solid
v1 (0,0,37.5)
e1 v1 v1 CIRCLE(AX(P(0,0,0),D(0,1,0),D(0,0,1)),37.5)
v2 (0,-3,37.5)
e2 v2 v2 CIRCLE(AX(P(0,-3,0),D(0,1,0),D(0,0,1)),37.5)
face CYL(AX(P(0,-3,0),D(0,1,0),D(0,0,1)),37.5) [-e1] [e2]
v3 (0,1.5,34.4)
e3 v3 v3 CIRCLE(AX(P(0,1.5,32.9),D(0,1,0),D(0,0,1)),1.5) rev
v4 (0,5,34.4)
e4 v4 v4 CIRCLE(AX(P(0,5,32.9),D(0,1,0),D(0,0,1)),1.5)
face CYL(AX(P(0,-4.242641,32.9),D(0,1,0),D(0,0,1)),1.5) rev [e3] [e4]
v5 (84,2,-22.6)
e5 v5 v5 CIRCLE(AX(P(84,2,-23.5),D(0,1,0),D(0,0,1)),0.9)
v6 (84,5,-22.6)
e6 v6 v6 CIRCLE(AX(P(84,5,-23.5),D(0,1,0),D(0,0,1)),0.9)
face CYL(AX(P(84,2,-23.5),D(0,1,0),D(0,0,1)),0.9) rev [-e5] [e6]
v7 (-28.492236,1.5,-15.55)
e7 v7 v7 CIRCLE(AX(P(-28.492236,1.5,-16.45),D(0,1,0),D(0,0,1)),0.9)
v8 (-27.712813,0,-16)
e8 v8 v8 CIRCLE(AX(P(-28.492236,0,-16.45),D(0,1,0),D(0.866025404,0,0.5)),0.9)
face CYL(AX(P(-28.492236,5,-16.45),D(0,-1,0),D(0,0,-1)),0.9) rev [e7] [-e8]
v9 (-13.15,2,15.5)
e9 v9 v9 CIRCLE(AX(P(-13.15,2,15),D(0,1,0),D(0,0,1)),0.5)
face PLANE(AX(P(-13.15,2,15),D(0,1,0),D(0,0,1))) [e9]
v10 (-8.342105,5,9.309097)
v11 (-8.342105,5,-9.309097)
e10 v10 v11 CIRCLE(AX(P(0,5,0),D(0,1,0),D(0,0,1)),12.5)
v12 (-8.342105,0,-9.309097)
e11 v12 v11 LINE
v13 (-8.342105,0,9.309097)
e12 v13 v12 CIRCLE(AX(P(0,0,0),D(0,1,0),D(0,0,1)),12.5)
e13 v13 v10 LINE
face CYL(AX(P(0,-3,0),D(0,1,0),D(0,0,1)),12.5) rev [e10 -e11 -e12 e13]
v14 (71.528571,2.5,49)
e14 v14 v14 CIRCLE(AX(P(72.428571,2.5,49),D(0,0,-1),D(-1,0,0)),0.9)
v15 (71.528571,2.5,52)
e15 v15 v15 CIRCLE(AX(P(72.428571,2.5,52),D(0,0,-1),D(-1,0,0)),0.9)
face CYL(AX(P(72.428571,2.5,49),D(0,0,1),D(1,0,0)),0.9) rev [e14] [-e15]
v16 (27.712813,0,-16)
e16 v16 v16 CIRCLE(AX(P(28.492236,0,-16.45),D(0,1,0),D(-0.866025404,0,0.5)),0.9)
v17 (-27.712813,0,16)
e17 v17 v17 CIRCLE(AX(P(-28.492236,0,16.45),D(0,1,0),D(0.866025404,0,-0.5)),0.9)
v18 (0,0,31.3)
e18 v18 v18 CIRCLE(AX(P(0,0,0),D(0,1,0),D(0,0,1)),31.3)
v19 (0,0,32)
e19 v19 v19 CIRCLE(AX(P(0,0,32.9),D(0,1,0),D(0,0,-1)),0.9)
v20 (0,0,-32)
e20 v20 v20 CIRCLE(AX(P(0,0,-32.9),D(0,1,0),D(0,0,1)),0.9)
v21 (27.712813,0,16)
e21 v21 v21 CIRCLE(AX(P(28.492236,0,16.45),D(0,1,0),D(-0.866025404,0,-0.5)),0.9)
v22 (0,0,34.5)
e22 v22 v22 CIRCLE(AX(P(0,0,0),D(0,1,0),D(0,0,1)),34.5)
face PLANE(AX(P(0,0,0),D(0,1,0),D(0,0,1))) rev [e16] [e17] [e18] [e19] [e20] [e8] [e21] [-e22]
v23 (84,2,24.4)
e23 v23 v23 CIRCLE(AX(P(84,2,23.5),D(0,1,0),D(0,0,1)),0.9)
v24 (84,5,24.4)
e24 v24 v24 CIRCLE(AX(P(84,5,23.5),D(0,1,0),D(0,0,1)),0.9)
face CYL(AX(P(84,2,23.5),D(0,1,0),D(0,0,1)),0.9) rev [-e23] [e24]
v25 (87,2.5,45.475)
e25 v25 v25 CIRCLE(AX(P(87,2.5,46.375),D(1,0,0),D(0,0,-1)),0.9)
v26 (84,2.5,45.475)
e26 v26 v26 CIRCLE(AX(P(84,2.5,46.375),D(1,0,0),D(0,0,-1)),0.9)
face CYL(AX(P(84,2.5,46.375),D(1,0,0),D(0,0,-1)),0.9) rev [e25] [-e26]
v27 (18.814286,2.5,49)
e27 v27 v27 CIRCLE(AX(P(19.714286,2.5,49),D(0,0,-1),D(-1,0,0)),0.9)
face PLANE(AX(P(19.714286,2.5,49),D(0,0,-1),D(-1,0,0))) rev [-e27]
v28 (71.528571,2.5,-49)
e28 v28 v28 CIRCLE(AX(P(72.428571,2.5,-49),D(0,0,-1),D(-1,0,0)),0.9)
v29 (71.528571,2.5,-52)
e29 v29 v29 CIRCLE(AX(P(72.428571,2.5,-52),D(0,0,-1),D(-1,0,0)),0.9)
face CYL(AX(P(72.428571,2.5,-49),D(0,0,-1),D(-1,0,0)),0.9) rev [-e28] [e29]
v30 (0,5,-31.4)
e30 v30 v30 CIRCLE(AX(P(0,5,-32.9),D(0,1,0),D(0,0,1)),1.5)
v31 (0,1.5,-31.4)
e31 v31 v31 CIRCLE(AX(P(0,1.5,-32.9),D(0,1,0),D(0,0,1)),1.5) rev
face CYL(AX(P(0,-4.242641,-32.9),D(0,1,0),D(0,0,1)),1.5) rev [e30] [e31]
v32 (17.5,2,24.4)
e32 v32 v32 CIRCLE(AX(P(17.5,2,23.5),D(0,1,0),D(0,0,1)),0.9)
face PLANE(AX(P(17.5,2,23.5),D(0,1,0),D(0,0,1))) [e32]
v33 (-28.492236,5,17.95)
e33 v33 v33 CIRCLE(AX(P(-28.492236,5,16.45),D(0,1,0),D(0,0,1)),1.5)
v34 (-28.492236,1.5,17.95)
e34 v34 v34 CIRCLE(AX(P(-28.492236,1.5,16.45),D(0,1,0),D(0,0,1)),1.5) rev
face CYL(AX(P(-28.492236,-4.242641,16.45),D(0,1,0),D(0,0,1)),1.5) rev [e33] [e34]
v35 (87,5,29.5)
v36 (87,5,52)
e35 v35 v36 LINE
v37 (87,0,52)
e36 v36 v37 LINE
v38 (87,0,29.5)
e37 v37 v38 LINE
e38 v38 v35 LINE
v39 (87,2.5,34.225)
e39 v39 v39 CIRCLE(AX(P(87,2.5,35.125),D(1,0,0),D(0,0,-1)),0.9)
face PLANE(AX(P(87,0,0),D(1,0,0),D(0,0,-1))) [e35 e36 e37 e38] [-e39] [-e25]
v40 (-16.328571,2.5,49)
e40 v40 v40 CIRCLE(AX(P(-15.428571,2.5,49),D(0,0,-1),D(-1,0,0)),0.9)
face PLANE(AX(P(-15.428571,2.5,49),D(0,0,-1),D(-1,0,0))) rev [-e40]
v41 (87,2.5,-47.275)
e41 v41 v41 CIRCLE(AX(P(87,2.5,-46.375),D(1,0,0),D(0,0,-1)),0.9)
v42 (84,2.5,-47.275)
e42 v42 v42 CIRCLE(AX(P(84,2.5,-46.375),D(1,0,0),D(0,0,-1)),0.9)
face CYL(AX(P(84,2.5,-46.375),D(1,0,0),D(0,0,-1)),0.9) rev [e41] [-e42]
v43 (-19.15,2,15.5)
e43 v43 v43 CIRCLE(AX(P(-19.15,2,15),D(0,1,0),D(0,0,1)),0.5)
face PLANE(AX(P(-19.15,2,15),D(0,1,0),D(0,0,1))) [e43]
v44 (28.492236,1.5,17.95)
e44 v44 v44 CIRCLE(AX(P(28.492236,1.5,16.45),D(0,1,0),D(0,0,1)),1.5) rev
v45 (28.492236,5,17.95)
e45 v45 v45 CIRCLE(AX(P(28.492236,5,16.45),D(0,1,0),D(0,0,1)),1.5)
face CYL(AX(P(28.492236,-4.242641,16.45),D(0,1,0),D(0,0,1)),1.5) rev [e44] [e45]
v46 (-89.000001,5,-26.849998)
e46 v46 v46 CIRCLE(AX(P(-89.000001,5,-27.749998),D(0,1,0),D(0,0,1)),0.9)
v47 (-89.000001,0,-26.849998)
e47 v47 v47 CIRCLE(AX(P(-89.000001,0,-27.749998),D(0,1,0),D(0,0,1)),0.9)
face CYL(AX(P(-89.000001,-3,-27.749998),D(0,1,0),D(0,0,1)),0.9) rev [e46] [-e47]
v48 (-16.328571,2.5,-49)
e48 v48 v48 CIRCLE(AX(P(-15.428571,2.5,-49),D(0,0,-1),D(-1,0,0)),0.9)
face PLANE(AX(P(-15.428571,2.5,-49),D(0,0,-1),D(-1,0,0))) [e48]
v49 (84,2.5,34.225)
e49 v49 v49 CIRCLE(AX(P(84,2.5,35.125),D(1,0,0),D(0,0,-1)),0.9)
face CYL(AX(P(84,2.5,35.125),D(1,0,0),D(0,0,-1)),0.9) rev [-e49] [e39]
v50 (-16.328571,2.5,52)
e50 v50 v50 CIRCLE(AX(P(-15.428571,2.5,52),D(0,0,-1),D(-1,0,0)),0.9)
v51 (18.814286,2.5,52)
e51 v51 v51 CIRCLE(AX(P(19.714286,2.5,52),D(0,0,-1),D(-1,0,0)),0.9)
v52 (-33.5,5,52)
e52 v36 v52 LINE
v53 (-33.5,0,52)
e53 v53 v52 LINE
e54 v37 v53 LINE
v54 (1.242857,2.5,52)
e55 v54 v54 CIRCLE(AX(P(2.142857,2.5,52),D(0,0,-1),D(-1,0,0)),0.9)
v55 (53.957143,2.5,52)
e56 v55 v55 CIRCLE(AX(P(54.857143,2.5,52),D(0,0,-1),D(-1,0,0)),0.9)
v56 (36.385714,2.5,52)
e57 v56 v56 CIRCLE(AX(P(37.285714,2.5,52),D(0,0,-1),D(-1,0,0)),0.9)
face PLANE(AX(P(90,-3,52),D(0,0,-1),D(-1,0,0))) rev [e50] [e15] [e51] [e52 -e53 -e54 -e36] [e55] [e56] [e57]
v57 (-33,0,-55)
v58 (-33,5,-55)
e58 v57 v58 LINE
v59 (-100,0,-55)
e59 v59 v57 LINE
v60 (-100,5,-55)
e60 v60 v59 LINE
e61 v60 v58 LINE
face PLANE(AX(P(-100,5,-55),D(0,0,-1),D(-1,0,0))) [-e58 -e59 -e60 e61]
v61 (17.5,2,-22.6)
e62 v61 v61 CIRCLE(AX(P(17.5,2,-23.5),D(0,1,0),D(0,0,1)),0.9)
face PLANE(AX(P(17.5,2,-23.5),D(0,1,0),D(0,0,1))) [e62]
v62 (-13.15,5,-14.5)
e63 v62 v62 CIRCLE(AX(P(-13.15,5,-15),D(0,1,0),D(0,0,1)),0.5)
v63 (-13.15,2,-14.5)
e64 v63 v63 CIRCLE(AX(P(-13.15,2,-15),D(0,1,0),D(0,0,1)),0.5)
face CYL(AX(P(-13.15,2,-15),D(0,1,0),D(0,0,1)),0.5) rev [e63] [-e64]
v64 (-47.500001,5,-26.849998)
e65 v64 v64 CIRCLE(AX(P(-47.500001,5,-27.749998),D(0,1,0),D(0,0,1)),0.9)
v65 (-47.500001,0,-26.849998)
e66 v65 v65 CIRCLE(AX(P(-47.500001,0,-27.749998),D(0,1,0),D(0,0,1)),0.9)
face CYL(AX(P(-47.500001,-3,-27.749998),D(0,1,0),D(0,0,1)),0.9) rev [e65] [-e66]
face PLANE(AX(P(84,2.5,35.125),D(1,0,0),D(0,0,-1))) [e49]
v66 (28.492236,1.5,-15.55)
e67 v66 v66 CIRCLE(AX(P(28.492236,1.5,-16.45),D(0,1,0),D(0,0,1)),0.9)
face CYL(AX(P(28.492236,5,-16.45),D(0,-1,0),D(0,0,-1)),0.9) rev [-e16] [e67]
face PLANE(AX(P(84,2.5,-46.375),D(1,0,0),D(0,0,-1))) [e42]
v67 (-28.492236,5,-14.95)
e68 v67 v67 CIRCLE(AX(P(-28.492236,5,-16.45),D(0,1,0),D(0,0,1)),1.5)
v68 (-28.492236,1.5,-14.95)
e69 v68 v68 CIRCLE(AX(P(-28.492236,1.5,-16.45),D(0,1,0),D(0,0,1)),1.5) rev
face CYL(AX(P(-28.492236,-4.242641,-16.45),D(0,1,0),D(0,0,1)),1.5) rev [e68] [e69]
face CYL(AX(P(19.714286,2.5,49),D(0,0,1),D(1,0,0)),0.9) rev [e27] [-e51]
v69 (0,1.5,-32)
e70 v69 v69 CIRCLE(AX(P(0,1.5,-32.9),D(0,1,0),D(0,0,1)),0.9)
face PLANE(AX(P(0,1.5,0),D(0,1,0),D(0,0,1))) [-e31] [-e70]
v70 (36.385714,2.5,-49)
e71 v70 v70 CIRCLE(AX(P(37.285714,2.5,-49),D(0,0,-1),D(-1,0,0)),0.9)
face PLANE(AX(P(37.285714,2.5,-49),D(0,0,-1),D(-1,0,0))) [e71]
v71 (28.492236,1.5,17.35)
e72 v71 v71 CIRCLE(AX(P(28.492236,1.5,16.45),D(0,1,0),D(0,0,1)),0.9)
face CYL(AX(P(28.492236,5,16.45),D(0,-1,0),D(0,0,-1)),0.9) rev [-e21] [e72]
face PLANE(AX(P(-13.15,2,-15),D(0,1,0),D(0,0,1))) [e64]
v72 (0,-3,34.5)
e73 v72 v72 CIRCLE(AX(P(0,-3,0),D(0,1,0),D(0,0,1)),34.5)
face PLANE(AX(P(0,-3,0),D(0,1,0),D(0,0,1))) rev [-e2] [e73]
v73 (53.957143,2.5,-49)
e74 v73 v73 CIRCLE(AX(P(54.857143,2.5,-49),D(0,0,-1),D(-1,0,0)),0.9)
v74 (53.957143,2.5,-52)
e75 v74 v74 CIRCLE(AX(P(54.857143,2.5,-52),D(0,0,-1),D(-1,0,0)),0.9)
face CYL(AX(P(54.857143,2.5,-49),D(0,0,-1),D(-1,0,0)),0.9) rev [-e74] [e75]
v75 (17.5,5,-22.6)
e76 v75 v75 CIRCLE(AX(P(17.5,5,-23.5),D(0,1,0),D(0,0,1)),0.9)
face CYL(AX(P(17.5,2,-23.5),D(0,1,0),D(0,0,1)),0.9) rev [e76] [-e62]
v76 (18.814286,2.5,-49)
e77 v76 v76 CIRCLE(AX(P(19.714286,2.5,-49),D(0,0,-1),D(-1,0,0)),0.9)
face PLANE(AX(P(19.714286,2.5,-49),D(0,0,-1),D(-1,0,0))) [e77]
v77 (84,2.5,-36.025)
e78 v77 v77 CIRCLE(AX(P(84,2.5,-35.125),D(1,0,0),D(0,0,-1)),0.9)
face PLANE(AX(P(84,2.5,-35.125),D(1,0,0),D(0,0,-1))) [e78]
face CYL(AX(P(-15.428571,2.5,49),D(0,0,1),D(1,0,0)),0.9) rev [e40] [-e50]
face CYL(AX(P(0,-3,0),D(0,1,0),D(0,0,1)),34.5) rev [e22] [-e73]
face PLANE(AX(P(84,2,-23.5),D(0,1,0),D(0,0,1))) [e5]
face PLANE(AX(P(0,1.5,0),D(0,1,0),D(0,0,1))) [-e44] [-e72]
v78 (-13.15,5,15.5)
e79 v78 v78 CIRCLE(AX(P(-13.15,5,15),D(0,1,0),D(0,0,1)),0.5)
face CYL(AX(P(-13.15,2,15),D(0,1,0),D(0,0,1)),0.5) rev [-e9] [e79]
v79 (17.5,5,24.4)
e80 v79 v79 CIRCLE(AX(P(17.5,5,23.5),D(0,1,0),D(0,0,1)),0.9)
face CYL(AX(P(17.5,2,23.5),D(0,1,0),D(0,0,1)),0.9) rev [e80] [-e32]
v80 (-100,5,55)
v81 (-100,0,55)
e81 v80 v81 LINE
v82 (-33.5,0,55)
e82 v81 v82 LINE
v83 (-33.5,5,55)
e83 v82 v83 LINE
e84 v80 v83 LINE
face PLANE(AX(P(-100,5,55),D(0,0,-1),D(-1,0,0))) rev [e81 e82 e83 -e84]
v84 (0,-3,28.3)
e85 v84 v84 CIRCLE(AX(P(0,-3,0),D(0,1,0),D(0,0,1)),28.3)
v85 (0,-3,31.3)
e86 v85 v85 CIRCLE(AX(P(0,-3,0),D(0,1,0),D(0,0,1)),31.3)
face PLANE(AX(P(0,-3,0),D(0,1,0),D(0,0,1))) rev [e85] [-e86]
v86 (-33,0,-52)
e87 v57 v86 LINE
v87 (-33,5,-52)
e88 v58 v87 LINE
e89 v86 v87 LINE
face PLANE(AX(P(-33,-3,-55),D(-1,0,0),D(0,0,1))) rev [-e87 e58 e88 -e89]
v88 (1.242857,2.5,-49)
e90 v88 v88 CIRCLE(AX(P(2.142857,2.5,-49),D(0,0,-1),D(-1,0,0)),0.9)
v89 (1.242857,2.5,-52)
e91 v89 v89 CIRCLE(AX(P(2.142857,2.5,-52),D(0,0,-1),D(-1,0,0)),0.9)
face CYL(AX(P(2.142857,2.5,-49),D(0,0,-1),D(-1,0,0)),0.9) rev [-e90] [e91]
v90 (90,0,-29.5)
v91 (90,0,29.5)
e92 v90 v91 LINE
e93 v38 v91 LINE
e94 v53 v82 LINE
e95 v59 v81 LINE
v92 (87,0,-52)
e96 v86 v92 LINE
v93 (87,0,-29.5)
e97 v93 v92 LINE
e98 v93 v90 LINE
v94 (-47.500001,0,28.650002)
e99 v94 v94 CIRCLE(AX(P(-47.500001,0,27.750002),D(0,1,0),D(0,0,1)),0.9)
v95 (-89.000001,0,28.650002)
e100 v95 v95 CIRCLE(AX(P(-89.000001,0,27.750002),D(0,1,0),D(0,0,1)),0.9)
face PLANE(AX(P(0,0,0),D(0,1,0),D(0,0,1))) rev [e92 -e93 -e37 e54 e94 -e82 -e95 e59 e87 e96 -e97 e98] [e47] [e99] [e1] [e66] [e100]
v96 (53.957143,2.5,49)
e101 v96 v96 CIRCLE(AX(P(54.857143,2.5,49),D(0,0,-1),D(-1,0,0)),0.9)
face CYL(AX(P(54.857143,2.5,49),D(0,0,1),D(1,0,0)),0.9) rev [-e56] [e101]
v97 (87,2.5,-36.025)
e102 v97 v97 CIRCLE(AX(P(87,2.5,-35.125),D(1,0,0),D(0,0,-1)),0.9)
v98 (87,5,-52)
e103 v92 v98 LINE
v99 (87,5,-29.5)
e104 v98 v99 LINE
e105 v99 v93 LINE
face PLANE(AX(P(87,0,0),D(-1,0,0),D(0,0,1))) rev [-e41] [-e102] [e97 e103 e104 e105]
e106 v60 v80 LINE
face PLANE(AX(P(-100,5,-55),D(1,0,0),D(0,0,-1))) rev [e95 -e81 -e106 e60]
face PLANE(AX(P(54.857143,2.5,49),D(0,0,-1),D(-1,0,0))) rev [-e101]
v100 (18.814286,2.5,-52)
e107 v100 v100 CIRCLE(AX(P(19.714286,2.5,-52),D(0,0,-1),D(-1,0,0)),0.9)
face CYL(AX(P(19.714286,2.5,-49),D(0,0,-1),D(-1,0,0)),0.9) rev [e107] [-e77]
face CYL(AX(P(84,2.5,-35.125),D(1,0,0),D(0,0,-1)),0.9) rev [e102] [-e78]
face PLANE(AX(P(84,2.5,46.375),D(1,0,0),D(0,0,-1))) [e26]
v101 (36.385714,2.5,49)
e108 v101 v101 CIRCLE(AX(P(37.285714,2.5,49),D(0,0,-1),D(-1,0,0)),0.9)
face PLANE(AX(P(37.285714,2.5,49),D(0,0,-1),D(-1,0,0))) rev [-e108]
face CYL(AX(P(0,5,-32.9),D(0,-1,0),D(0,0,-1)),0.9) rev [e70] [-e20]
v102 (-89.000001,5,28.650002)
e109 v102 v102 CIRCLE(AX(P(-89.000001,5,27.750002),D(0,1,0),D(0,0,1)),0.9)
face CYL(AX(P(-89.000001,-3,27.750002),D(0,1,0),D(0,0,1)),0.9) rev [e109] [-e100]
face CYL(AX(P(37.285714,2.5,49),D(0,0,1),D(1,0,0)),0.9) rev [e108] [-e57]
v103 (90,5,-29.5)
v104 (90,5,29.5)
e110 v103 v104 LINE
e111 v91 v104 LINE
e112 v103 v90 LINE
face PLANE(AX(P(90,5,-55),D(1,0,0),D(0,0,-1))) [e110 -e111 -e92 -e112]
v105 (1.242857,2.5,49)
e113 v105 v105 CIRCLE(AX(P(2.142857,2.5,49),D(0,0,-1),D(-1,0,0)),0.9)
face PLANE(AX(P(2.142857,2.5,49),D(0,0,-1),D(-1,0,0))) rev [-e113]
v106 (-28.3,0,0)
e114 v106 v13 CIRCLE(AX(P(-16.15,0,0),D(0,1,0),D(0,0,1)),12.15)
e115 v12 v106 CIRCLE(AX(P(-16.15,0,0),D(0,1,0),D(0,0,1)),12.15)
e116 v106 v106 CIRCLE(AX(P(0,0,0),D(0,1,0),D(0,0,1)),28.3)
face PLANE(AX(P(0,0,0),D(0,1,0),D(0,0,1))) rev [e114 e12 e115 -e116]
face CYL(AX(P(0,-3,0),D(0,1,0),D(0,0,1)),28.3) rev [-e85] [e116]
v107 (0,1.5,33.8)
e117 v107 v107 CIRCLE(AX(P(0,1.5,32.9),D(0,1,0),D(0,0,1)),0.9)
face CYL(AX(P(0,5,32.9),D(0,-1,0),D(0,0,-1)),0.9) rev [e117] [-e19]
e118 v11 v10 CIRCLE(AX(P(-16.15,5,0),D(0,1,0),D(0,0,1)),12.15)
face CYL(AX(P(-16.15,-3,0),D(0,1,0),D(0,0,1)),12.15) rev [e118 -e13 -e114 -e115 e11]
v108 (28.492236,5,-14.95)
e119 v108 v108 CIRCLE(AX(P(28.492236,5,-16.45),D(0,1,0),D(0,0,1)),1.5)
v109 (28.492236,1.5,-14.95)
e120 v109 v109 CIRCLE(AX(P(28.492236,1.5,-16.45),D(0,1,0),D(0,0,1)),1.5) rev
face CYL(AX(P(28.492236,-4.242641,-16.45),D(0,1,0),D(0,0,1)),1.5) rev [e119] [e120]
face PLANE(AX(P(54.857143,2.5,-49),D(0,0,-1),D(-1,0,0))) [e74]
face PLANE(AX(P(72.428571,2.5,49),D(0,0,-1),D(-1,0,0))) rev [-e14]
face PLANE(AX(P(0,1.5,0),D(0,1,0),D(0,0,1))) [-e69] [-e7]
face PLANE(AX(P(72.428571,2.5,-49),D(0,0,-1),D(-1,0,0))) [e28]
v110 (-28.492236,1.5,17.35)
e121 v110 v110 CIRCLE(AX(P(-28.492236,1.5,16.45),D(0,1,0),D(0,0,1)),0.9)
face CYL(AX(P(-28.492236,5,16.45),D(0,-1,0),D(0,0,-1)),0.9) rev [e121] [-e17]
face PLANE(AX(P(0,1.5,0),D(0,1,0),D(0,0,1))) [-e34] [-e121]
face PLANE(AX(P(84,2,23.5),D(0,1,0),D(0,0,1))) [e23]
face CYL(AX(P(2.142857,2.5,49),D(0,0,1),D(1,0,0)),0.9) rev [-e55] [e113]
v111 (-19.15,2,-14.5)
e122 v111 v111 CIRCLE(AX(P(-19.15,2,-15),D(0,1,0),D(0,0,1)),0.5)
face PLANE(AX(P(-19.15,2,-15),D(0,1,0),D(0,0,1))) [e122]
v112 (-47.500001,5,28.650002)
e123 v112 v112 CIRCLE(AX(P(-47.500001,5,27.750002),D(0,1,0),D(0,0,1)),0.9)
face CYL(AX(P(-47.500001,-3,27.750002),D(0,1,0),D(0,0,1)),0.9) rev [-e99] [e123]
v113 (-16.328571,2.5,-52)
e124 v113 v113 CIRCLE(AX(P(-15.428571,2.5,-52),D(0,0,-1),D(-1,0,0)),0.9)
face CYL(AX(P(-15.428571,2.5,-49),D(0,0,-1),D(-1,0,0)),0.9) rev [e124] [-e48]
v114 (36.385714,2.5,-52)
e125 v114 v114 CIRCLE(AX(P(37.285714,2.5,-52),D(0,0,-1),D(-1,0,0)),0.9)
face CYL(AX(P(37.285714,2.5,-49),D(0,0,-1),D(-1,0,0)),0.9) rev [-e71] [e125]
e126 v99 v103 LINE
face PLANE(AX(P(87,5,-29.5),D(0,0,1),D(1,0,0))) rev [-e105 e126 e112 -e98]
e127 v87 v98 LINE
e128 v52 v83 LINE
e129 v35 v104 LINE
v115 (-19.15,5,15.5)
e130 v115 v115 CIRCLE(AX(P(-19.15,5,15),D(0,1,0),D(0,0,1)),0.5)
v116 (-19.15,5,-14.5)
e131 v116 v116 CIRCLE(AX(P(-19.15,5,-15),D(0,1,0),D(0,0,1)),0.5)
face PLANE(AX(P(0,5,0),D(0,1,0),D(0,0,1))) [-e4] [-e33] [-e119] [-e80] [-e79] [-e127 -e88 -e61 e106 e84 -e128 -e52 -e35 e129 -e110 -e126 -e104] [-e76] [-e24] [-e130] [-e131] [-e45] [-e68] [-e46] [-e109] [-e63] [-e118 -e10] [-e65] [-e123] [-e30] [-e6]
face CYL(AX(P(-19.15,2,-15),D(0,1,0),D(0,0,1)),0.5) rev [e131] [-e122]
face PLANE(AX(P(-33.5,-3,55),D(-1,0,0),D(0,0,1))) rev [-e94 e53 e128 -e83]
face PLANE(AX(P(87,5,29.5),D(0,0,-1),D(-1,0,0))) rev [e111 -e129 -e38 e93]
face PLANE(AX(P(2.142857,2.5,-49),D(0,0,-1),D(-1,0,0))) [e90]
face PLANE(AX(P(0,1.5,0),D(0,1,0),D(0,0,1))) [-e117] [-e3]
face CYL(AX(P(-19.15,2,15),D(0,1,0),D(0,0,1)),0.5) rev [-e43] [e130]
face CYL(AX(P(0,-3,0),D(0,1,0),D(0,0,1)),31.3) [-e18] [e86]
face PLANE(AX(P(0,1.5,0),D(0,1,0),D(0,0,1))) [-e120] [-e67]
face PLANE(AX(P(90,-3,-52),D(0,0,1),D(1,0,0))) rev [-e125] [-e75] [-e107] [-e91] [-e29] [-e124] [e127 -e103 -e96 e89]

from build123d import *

# Parameters (mm, degrees)
SKETCH_1_W               = 190
SKETCH_1_H               = 110
EXTRUDE_1_DEPTH          = 5
EXTRUDE_2_DEPTH          = 3
CUT_EXTRUDE_1_DEPTH      = 115.236596588
CUT_EXTRUDE_1_DEPTH_BACK = 115.236596588
SKETCH_1_12_R            = 0.9
CUT_EXTRUDE_3_DEPTH      = 115.236596588
CUT_EXTRUDE_START        = 5
SKETCH_1_13_R            = 1.5
CUT_EXTRUDE_4_DEPTH      = 3.5
PATTERN_CIRCULAR_1_COUNT = 6
SKETCH_2_R               = 0.5
CUT_EXTRUDE_5_DEPTH      = 3
CUT_EXTRUDE_6_DEPTH      = 115.236596588
CUT_EXTRUDE_6_DEPTH_BACK = 115.236596588
SKETCH_1_14_R            = 12.5
SKETCH_3_R               = 0.9
CUT_EXTRUDE_7_DEPTH      = 3
SKETCH_4_R               = 0.9
CUT_EXTRUDE_8_DEPTH      = 115.407167608
SKETCH_5_W               = 123
SKETCH_5_H               = 3
SKETCH_5_W_2             = 123.499999633
CUT_EXTRUDE_9_DEPTH      = 115.407167608
SKETCH_6_R               = 0.9
CUT_EXTRUDE_10_DEPTH     = 3
CUT_EXTRUDE_START_2      = -101
SKETCH_6_2_R             = 0.9
CUT_EXTRUDE_11_DEPTH     = 3
SKETCH_7_W               = 22.5
SKETCH_7_H               = 5
CUT_EXTRUDE_12_DEPTH     = 3
SKETCH_8_R               = 0.9
CUT_EXTRUDE_13_DEPTH     = 3


with BuildPart() as part:
    # 草图1 → 凸台-拉伸1 (new body)
    with BuildSketch(Plane(origin=(0, 0, 0), x_dir=(1, 0, 0), z_dir=(0, 1, 0))):
        with Locations((-5, 0)):
            Rectangle(SKETCH_1_W, SKETCH_1_H)
    extrude(amount=EXTRUDE_1_DEPTH)

    # 草图1<10> → 凸台-拉伸2 (add)
    with BuildSketch(Plane(origin=(0, 0, 0), x_dir=(1, 0, 0), z_dir=(0, 1, 0))):
        with BuildLine():
            ThreePointArc((-34.5, 0), (0, 34.5), (34.5, 0))
            Line((34.5, 0), (37.5, 0))
            ThreePointArc((37.5, 0), (0, 37.5), (-37.5, 0))
            Line((-37.5, 0), (-34.5, 0))
        make_face()
        with BuildLine():
            Line((37.5, 0), (34.5, 0))
            ThreePointArc((34.5, 0), (0, -34.5), (-34.5, 0))
            Line((-34.5, 0), (-37.5, 0))
            ThreePointArc((-37.5, 0), (0, -37.5), (37.5, 0))
        make_face()
        with BuildLine():
            ThreePointArc((-28.3, 3.9e-08), (2e-08, 28.3), (28.3, 0))
            Line((28.3, 0), (31.3, 0))
            ThreePointArc((31.3, 0), (0, 31.3), (-31.3, 0))
            Line((-31.3, 0), (-28.3, 0))
        make_face()
        with BuildLine():
            Line((31.3, 0), (28.3, 0))
            ThreePointArc((28.3, 0), (-2e-08, -28.3), (-28.3, 3.9e-08))
            Line((-28.3, 0), (-31.3, 0))
            ThreePointArc((-31.3, 0), (0, -31.3), (31.3, 0))
        make_face()
    extrude(amount=-EXTRUDE_2_DEPTH)

    # 草图1<11> → 切除-拉伸1 (cut, two sides: drawn at the far end of the back side and taken through both)
    with BuildSketch(Plane(origin=(0, 0, 0), x_dir=(1, 0, 0), z_dir=(0, 1, 0)).offset(-CUT_EXTRUDE_1_DEPTH_BACK)):
        with BuildLine():
            ThreePointArc((-8.342105263, -9.309096615), (-12.5, 0), (-8.342105263, 9.309096615))
            ThreePointArc((-8.342105263, 9.309096615), (-28.3, 0), (-8.342105263, -9.309096615))
        make_face()
    extrude(amount=CUT_EXTRUDE_1_DEPTH + CUT_EXTRUDE_1_DEPTH_BACK, mode=Mode.SUBTRACT)

    # 草图1<12> → 切除-拉伸3 (cut, through all)
    with BuildSketch(Plane(origin=(0, 0, 0), x_dir=(1, 0, 0), z_dir=(0, 1, 0))):
        with Locations(Location((0, 32.9, 0), (0, 0, 270))):
            Circle(SKETCH_1_12_R)
    cut_extrude_3 = extrude(amount=CUT_EXTRUDE_3_DEPTH, mode=Mode.SUBTRACT)

    # 草图1<13> → 切除-拉伸4 (cut)
    with BuildSketch(Plane(origin=(0, 0, 0), x_dir=(1, 0, 0), z_dir=(0, 1, 0)).offset(CUT_EXTRUDE_START)):
        with Locations(Location((0, 32.9, 0), (0, 0, 270))):
            Circle(SKETCH_1_13_R)
    cut_extrude_4 = extrude(amount=-CUT_EXTRUDE_4_DEPTH, mode=Mode.SUBTRACT)

    # 阵列(圆周)1: 切除-拉伸3, 切除-拉伸4 ×6 about axis
    pattern_circular_1_axis = Axis((0, 0, 0), (0, 1, 0))
    add([cut_extrude_3.rotate(pattern_circular_1_axis, i * 360 / PATTERN_CIRCULAR_1_COUNT) for i in range(1, PATTERN_CIRCULAR_1_COUNT)], mode=Mode.SUBTRACT)
    add([cut_extrude_4.rotate(pattern_circular_1_axis, i * 360 / PATTERN_CIRCULAR_1_COUNT) for i in range(1, PATTERN_CIRCULAR_1_COUNT)], mode=Mode.SUBTRACT)

    # 草图2 → 切除-拉伸5 (cut)
    with BuildSketch(Plane(origin=(0, 5, 0), x_dir=(1, 0, 0), z_dir=(0, 1, 0))):
        with Locations(Location((-19.15, -15, 0), (0, 0, 270))):
            Circle(SKETCH_2_R)
        with Locations(Location((-13.15, -15, 0), (0, 0, 270))):
            Circle(SKETCH_2_R)
        with Locations(Location((-19.15, 15, 0), (0, 0, 270))):
            Circle(SKETCH_2_R)
        with Locations(Location((-13.15, 15, 0), (0, 0, 270))):
            Circle(SKETCH_2_R)
    extrude(amount=-CUT_EXTRUDE_5_DEPTH, mode=Mode.SUBTRACT)

    # 草图1<14> → 切除-拉伸6 (cut, two sides: drawn at the far end of the back side and taken through both)
    with BuildSketch(Plane(origin=(0, 0, 0), x_dir=(1, 0, 0), z_dir=(0, 1, 0)).offset(-CUT_EXTRUDE_6_DEPTH_BACK)):
        Circle(SKETCH_1_14_R)
    extrude(amount=CUT_EXTRUDE_6_DEPTH + CUT_EXTRUDE_6_DEPTH_BACK, mode=Mode.SUBTRACT)

    # 草图3 → 切除-拉伸7 (cut)
    with BuildSketch(Plane(origin=(0, 5, 0), x_dir=(1, 0, 0), z_dir=(0, 1, 0))):
        with Locations(Location((17.5, 23.5, 0), (0, 0, 270))):
            Circle(SKETCH_3_R)
        with Locations(Location((17.5, -23.5, 0), (0, 0, 270))):
            Circle(SKETCH_3_R)
        with Locations(Location((84, 23.5, 0), (0, 0, 270))):
            Circle(SKETCH_3_R)
        with Locations(Location((84, -23.5, 0), (0, 0, 270))):
            Circle(SKETCH_3_R)
    extrude(amount=-CUT_EXTRUDE_7_DEPTH, mode=Mode.SUBTRACT)

    # 草图4 → 切除-拉伸8 (cut, through all)
    with BuildSketch(Plane(origin=(0, 5, 0), x_dir=(1, 0, 0), z_dir=(0, 1, 0))):
        with Locations(Location((-89.000001478, 27.749997941, 0), (0, 0, 270))):
            Circle(SKETCH_4_R)
        with Locations(Location((-47.500001478, 27.749997941, 0), (0, 0, 270))):
            Circle(SKETCH_4_R)
        with Locations(Location((-89.000001478, -27.750002059, 0), (0, 0, 270))):
            Circle(SKETCH_4_R)
        with Locations(Location((-47.500001478, -27.750002059, 0), (0, 0, 270))):
            Circle(SKETCH_4_R)
    extrude(amount=-CUT_EXTRUDE_8_DEPTH, mode=Mode.SUBTRACT)

    # 草图5 → 切除-拉伸9 (cut, through all)
    with BuildSketch(Plane(origin=(0, 5, 0), x_dir=(1, 0, 0), z_dir=(0, 1, 0))):
        with Locations((28.5, 53.5)):
            Rectangle(SKETCH_5_W, SKETCH_5_H)
        with Locations((28.250000183, -53.5)):
            Rectangle(SKETCH_5_W_2, SKETCH_5_H)
    extrude(amount=-CUT_EXTRUDE_9_DEPTH, mode=Mode.SUBTRACT)

    # 草图6 → 切除-拉伸10 (cut)
    with BuildSketch(Plane(origin=(0, 0, -52), x_dir=(-1, 0, 0), z_dir=(0, 0, -1))):
        with Locations((15.428571429, 2.5)):
            Circle(SKETCH_6_R)
        with Locations((-2.142857143, 2.5)):
            Circle(SKETCH_6_R)
        with Locations((-19.714285714, 2.5)):
            Circle(SKETCH_6_R)
        with Locations((-37.285714286, 2.5)):
            Circle(SKETCH_6_R)
        with Locations((-54.857142857, 2.5)):
            Circle(SKETCH_6_R)
        with Locations((-72.428571429, 2.5)):
            Circle(SKETCH_6_R)
    extrude(amount=-CUT_EXTRUDE_10_DEPTH, mode=Mode.SUBTRACT)

    # 草图6<2> → 切除-拉伸11 (cut)
    with BuildSketch(Plane(origin=(0, 0, -52), x_dir=(-1, 0, 0), z_dir=(0, 0, -1)).offset(CUT_EXTRUDE_START_2)):
        with Locations((15.428571429, 2.5)):
            Circle(SKETCH_6_2_R)
        with Locations((-2.142857143, 2.5)):
            Circle(SKETCH_6_2_R)
        with Locations((-19.714285714, 2.5)):
            Circle(SKETCH_6_2_R)
        with Locations((-37.285714286, 2.5)):
            Circle(SKETCH_6_2_R)
        with Locations((-54.857142857, 2.5)):
            Circle(SKETCH_6_2_R)
        with Locations((-72.428571429, 2.5)):
            Circle(SKETCH_6_2_R)
    extrude(amount=-CUT_EXTRUDE_11_DEPTH, mode=Mode.SUBTRACT)

    # 草图7 → 切除-拉伸12 (cut)
    with BuildSketch(Plane(origin=(90, 0, 0), x_dir=(0, 0, -1), z_dir=(1, 0, 0))):
        with Locations((40.75, 2.5)):
            Rectangle(SKETCH_7_W, SKETCH_7_H)
        with Locations((-40.75, 2.5)):
            Rectangle(SKETCH_7_W, SKETCH_7_H)
    extrude(amount=-CUT_EXTRUDE_12_DEPTH, mode=Mode.SUBTRACT)

    # 草图8 → 切除-拉伸13 (cut)
    with BuildSketch(Plane(origin=(87, 0, 0), x_dir=(0, 0, -1), z_dir=(1, 0, 0))):
        with Locations((35.125, 2.5)):
            Circle(SKETCH_8_R)
        with Locations((46.375, 2.5)):
            Circle(SKETCH_8_R)
        with Locations((-46.375, 2.5)):
            Circle(SKETCH_8_R)
        with Locations((-35.125, 2.5)):
            Circle(SKETCH_8_R)
    extrude(amount=-CUT_EXTRUDE_13_DEPTH, mode=Mode.SUBTRACT)


solid = part.part
